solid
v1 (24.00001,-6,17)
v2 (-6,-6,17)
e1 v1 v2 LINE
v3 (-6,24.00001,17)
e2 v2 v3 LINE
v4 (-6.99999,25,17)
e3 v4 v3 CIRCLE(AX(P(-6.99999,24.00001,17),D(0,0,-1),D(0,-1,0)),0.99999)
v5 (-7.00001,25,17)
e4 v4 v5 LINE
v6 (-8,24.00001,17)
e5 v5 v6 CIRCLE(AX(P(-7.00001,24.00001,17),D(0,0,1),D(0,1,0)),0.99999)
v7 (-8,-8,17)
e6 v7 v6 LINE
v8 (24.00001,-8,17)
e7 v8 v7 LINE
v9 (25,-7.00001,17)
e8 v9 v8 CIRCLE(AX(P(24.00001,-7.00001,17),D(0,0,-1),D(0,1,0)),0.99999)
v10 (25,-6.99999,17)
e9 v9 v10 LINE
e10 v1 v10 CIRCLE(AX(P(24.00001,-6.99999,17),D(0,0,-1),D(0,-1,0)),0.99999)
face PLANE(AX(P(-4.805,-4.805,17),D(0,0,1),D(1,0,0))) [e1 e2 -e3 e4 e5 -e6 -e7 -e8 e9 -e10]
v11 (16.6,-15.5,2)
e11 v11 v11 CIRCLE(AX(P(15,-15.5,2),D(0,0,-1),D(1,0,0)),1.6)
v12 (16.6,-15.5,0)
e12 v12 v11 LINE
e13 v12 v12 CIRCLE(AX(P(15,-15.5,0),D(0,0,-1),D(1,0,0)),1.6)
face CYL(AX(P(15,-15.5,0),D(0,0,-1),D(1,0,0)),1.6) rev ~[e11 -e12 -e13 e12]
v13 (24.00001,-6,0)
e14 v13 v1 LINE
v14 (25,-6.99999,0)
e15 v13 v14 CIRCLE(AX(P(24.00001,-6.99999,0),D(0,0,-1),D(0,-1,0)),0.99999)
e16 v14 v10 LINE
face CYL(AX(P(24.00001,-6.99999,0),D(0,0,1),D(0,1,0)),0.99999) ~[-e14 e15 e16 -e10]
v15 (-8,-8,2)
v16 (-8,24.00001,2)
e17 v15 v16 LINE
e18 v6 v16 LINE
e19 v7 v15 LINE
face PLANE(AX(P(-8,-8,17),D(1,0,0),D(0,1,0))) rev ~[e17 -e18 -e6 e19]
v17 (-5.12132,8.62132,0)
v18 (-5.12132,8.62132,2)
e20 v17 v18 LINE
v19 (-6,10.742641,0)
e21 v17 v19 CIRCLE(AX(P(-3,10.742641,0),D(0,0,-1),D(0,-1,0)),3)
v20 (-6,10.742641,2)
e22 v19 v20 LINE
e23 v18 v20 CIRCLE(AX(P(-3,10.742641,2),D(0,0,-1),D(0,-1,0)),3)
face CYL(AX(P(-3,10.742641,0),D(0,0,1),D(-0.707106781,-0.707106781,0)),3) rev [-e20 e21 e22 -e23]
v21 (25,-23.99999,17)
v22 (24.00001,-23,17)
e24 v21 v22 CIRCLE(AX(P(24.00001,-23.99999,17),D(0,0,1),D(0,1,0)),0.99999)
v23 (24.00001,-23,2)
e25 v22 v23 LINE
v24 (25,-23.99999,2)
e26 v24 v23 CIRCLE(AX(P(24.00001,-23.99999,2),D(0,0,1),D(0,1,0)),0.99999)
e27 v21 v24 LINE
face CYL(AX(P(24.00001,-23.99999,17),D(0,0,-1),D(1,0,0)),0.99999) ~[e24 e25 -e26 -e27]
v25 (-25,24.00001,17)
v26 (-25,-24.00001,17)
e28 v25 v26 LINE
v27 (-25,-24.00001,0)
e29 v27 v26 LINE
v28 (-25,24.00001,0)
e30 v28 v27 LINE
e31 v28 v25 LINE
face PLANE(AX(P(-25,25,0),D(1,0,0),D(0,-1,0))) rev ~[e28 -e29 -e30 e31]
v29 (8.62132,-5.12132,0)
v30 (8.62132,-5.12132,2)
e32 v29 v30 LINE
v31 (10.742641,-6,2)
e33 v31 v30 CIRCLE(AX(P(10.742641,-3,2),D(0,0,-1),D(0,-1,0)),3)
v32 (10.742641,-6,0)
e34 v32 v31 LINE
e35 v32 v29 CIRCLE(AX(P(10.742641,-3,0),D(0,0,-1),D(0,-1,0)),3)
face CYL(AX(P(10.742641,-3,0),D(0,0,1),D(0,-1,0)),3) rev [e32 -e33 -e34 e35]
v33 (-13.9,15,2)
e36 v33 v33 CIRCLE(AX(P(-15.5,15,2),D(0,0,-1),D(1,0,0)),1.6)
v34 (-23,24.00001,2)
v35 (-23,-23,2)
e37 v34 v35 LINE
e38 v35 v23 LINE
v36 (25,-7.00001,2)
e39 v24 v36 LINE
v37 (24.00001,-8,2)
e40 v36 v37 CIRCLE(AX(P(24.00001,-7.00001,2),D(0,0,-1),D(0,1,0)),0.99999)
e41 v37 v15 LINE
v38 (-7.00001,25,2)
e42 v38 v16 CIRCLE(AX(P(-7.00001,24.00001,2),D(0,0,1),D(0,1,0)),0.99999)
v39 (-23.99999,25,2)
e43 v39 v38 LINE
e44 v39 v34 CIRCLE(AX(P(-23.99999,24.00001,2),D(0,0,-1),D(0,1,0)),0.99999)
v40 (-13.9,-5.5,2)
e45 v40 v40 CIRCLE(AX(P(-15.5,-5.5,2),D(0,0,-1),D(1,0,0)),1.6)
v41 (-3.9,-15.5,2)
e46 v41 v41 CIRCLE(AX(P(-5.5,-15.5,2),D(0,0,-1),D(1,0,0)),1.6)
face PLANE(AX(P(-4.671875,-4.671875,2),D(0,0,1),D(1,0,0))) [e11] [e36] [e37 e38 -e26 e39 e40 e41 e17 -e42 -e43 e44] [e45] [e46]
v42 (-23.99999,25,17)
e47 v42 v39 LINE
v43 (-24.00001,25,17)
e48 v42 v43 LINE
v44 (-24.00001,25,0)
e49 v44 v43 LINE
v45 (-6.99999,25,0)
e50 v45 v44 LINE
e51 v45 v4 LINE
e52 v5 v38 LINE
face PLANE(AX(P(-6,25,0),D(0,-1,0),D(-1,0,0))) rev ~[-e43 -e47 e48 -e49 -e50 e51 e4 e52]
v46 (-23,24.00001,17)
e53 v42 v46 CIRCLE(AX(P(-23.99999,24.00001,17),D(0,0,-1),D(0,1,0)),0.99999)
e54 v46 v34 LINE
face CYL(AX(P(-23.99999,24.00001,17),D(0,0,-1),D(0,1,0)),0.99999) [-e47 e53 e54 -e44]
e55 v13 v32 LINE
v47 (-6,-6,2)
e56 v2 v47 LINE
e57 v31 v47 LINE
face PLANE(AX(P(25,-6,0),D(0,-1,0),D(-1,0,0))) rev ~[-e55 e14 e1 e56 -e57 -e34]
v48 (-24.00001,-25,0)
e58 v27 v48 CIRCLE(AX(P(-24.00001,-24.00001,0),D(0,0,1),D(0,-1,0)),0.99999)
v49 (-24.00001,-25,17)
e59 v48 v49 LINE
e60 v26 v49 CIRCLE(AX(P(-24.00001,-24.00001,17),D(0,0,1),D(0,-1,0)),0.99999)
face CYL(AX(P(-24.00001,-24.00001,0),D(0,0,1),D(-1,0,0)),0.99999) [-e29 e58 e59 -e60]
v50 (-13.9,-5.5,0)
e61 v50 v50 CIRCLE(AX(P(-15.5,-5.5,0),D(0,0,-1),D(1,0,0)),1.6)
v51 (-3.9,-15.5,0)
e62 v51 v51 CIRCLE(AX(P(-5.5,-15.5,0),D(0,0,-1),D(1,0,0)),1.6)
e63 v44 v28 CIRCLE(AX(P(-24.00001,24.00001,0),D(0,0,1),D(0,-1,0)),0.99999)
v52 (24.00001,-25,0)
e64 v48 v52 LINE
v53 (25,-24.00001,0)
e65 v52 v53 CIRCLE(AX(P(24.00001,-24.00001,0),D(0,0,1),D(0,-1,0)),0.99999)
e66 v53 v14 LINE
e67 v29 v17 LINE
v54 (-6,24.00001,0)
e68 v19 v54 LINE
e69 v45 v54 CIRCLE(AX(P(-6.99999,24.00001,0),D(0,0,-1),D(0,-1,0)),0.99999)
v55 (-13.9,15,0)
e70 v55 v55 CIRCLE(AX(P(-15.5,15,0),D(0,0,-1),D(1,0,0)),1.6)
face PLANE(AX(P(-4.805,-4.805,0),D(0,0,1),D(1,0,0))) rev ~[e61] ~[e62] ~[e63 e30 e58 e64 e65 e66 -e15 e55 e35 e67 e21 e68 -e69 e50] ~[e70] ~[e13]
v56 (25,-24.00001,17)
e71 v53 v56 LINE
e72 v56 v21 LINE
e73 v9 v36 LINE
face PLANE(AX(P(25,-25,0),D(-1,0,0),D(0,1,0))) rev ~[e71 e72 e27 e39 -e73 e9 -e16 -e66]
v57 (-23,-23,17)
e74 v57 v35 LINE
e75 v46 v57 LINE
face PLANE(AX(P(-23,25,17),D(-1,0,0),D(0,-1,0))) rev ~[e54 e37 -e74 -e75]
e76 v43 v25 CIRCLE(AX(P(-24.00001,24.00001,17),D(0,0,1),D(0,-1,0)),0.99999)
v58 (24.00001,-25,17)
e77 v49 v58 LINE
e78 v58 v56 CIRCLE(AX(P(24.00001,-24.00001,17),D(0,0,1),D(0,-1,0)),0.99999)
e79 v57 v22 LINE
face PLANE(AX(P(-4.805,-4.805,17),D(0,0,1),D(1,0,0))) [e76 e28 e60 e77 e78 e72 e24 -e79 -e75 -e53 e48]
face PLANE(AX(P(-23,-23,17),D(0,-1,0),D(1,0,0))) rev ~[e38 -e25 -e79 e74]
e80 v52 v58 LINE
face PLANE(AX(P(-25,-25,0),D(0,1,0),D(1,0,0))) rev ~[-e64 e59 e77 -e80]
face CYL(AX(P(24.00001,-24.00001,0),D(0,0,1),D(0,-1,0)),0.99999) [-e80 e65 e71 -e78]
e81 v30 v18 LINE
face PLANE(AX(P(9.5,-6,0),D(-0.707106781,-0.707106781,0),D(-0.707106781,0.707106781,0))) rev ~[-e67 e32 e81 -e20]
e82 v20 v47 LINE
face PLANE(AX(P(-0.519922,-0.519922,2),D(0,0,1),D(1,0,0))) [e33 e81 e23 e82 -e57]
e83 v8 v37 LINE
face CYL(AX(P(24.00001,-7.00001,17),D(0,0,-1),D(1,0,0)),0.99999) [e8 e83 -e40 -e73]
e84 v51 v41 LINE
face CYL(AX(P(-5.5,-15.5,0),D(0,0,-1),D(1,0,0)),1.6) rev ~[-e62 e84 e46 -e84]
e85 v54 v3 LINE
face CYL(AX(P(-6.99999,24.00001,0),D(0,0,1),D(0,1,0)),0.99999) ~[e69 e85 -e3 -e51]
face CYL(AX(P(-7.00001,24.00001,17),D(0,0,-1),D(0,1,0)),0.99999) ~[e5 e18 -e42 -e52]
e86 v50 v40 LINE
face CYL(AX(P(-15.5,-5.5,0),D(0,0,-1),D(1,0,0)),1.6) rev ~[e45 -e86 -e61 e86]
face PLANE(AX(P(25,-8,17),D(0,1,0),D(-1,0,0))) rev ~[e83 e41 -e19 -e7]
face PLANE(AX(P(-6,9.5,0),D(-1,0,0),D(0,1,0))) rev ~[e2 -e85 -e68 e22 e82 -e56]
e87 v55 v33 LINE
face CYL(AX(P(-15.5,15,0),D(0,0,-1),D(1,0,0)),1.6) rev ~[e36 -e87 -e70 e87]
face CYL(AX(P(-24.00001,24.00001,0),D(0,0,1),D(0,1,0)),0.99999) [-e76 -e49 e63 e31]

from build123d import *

# Parameters (mm, degrees)
F1_DEPTH = 17
F3_DEPTH = 15
F4_R     = 1.6
F5_DEPTH = 2
F6_R     = 0.99999
F8_DEPTH = 15
F9_R     = 3


# Not quite as in the source:
# - a fillet or chamfer is up to 0.001 mm smaller than in the source, because OpenCascade refuses the exact size


with BuildPart() as f1:
    # F0 (on Top) → F1 (new body)
    with BuildSketch(Plane.XY):
        Polygon((-6, 25), (-25, 25), (-25, -25), (25, -25), (25, -6), (9.5, -6), (-6, -6), (-6, 9.5), align=None)
        Polygon((9.5, -6), (-6, 9.5), (-6, -6), align=None)
    extrude(amount=F1_DEPTH)

    # F2 (on face) → F3 (cut)
    with BuildSketch(Plane.XY.offset(17)):
        Polygon((-8, 25), (-23, 25), (-23, -23), (25, -23), (25, -8), (-6, -8), (-8, -8), (-8, -6), align=None)
    extrude(amount=-F3_DEPTH, mode=Mode.SUBTRACT)

    # F4 (on face) → F5 (cut, through all)
    with BuildSketch(Plane(origin=(0, 0, 0), x_dir=(1, 0, 0), z_dir=(0, 0, -1))):
        with Locations((15, 15.5)):
            Circle(F4_R)
        with Locations((-5.5, 15.5)):
            Circle(F4_R)
        with Locations((-15.5, 5.5)):
            Circle(F4_R)
        with Locations((-15.5, -15)):
            Circle(F4_R)
    extrude(amount=-F5_DEPTH, mode=Mode.SUBTRACT)

    # F6 (radius 1 in the source; OpenCascade refuses exactly that, so slightly less here)
    f6_edges = [f1.edges().sort_by_distance(p)[0] for p in [
        (25, -25, 8.5),
        (25, -23, 9.5),
        (25, -8, 9.5),
        (25, -6, 8.5),
        (-25, -25, 8.5),
        (-25, 25, 8.5),
        (-8, 25, 9.5),
        (-23, 25, 9.5),
        (-6, 25, 8.5),
    ]]
    fillet(f6_edges, radius=F6_R)

    # F7 (on face) → F8 (cut)
    with BuildSketch(Plane.XY.offset(17)):
        Polygon((-6, -6), (9.5, -6), (-6, 9.5), align=None)
    extrude(amount=-F8_DEPTH, mode=Mode.SUBTRACT)

    # F9
    f9_edges = [f1.edges().sort_by_distance(p)[0] for p in [
        (-6, 9.5, 1),
        (9.5, -6, 1),
    ]]
    fillet(f9_edges, radius=F9_R)


solid = f1.part
